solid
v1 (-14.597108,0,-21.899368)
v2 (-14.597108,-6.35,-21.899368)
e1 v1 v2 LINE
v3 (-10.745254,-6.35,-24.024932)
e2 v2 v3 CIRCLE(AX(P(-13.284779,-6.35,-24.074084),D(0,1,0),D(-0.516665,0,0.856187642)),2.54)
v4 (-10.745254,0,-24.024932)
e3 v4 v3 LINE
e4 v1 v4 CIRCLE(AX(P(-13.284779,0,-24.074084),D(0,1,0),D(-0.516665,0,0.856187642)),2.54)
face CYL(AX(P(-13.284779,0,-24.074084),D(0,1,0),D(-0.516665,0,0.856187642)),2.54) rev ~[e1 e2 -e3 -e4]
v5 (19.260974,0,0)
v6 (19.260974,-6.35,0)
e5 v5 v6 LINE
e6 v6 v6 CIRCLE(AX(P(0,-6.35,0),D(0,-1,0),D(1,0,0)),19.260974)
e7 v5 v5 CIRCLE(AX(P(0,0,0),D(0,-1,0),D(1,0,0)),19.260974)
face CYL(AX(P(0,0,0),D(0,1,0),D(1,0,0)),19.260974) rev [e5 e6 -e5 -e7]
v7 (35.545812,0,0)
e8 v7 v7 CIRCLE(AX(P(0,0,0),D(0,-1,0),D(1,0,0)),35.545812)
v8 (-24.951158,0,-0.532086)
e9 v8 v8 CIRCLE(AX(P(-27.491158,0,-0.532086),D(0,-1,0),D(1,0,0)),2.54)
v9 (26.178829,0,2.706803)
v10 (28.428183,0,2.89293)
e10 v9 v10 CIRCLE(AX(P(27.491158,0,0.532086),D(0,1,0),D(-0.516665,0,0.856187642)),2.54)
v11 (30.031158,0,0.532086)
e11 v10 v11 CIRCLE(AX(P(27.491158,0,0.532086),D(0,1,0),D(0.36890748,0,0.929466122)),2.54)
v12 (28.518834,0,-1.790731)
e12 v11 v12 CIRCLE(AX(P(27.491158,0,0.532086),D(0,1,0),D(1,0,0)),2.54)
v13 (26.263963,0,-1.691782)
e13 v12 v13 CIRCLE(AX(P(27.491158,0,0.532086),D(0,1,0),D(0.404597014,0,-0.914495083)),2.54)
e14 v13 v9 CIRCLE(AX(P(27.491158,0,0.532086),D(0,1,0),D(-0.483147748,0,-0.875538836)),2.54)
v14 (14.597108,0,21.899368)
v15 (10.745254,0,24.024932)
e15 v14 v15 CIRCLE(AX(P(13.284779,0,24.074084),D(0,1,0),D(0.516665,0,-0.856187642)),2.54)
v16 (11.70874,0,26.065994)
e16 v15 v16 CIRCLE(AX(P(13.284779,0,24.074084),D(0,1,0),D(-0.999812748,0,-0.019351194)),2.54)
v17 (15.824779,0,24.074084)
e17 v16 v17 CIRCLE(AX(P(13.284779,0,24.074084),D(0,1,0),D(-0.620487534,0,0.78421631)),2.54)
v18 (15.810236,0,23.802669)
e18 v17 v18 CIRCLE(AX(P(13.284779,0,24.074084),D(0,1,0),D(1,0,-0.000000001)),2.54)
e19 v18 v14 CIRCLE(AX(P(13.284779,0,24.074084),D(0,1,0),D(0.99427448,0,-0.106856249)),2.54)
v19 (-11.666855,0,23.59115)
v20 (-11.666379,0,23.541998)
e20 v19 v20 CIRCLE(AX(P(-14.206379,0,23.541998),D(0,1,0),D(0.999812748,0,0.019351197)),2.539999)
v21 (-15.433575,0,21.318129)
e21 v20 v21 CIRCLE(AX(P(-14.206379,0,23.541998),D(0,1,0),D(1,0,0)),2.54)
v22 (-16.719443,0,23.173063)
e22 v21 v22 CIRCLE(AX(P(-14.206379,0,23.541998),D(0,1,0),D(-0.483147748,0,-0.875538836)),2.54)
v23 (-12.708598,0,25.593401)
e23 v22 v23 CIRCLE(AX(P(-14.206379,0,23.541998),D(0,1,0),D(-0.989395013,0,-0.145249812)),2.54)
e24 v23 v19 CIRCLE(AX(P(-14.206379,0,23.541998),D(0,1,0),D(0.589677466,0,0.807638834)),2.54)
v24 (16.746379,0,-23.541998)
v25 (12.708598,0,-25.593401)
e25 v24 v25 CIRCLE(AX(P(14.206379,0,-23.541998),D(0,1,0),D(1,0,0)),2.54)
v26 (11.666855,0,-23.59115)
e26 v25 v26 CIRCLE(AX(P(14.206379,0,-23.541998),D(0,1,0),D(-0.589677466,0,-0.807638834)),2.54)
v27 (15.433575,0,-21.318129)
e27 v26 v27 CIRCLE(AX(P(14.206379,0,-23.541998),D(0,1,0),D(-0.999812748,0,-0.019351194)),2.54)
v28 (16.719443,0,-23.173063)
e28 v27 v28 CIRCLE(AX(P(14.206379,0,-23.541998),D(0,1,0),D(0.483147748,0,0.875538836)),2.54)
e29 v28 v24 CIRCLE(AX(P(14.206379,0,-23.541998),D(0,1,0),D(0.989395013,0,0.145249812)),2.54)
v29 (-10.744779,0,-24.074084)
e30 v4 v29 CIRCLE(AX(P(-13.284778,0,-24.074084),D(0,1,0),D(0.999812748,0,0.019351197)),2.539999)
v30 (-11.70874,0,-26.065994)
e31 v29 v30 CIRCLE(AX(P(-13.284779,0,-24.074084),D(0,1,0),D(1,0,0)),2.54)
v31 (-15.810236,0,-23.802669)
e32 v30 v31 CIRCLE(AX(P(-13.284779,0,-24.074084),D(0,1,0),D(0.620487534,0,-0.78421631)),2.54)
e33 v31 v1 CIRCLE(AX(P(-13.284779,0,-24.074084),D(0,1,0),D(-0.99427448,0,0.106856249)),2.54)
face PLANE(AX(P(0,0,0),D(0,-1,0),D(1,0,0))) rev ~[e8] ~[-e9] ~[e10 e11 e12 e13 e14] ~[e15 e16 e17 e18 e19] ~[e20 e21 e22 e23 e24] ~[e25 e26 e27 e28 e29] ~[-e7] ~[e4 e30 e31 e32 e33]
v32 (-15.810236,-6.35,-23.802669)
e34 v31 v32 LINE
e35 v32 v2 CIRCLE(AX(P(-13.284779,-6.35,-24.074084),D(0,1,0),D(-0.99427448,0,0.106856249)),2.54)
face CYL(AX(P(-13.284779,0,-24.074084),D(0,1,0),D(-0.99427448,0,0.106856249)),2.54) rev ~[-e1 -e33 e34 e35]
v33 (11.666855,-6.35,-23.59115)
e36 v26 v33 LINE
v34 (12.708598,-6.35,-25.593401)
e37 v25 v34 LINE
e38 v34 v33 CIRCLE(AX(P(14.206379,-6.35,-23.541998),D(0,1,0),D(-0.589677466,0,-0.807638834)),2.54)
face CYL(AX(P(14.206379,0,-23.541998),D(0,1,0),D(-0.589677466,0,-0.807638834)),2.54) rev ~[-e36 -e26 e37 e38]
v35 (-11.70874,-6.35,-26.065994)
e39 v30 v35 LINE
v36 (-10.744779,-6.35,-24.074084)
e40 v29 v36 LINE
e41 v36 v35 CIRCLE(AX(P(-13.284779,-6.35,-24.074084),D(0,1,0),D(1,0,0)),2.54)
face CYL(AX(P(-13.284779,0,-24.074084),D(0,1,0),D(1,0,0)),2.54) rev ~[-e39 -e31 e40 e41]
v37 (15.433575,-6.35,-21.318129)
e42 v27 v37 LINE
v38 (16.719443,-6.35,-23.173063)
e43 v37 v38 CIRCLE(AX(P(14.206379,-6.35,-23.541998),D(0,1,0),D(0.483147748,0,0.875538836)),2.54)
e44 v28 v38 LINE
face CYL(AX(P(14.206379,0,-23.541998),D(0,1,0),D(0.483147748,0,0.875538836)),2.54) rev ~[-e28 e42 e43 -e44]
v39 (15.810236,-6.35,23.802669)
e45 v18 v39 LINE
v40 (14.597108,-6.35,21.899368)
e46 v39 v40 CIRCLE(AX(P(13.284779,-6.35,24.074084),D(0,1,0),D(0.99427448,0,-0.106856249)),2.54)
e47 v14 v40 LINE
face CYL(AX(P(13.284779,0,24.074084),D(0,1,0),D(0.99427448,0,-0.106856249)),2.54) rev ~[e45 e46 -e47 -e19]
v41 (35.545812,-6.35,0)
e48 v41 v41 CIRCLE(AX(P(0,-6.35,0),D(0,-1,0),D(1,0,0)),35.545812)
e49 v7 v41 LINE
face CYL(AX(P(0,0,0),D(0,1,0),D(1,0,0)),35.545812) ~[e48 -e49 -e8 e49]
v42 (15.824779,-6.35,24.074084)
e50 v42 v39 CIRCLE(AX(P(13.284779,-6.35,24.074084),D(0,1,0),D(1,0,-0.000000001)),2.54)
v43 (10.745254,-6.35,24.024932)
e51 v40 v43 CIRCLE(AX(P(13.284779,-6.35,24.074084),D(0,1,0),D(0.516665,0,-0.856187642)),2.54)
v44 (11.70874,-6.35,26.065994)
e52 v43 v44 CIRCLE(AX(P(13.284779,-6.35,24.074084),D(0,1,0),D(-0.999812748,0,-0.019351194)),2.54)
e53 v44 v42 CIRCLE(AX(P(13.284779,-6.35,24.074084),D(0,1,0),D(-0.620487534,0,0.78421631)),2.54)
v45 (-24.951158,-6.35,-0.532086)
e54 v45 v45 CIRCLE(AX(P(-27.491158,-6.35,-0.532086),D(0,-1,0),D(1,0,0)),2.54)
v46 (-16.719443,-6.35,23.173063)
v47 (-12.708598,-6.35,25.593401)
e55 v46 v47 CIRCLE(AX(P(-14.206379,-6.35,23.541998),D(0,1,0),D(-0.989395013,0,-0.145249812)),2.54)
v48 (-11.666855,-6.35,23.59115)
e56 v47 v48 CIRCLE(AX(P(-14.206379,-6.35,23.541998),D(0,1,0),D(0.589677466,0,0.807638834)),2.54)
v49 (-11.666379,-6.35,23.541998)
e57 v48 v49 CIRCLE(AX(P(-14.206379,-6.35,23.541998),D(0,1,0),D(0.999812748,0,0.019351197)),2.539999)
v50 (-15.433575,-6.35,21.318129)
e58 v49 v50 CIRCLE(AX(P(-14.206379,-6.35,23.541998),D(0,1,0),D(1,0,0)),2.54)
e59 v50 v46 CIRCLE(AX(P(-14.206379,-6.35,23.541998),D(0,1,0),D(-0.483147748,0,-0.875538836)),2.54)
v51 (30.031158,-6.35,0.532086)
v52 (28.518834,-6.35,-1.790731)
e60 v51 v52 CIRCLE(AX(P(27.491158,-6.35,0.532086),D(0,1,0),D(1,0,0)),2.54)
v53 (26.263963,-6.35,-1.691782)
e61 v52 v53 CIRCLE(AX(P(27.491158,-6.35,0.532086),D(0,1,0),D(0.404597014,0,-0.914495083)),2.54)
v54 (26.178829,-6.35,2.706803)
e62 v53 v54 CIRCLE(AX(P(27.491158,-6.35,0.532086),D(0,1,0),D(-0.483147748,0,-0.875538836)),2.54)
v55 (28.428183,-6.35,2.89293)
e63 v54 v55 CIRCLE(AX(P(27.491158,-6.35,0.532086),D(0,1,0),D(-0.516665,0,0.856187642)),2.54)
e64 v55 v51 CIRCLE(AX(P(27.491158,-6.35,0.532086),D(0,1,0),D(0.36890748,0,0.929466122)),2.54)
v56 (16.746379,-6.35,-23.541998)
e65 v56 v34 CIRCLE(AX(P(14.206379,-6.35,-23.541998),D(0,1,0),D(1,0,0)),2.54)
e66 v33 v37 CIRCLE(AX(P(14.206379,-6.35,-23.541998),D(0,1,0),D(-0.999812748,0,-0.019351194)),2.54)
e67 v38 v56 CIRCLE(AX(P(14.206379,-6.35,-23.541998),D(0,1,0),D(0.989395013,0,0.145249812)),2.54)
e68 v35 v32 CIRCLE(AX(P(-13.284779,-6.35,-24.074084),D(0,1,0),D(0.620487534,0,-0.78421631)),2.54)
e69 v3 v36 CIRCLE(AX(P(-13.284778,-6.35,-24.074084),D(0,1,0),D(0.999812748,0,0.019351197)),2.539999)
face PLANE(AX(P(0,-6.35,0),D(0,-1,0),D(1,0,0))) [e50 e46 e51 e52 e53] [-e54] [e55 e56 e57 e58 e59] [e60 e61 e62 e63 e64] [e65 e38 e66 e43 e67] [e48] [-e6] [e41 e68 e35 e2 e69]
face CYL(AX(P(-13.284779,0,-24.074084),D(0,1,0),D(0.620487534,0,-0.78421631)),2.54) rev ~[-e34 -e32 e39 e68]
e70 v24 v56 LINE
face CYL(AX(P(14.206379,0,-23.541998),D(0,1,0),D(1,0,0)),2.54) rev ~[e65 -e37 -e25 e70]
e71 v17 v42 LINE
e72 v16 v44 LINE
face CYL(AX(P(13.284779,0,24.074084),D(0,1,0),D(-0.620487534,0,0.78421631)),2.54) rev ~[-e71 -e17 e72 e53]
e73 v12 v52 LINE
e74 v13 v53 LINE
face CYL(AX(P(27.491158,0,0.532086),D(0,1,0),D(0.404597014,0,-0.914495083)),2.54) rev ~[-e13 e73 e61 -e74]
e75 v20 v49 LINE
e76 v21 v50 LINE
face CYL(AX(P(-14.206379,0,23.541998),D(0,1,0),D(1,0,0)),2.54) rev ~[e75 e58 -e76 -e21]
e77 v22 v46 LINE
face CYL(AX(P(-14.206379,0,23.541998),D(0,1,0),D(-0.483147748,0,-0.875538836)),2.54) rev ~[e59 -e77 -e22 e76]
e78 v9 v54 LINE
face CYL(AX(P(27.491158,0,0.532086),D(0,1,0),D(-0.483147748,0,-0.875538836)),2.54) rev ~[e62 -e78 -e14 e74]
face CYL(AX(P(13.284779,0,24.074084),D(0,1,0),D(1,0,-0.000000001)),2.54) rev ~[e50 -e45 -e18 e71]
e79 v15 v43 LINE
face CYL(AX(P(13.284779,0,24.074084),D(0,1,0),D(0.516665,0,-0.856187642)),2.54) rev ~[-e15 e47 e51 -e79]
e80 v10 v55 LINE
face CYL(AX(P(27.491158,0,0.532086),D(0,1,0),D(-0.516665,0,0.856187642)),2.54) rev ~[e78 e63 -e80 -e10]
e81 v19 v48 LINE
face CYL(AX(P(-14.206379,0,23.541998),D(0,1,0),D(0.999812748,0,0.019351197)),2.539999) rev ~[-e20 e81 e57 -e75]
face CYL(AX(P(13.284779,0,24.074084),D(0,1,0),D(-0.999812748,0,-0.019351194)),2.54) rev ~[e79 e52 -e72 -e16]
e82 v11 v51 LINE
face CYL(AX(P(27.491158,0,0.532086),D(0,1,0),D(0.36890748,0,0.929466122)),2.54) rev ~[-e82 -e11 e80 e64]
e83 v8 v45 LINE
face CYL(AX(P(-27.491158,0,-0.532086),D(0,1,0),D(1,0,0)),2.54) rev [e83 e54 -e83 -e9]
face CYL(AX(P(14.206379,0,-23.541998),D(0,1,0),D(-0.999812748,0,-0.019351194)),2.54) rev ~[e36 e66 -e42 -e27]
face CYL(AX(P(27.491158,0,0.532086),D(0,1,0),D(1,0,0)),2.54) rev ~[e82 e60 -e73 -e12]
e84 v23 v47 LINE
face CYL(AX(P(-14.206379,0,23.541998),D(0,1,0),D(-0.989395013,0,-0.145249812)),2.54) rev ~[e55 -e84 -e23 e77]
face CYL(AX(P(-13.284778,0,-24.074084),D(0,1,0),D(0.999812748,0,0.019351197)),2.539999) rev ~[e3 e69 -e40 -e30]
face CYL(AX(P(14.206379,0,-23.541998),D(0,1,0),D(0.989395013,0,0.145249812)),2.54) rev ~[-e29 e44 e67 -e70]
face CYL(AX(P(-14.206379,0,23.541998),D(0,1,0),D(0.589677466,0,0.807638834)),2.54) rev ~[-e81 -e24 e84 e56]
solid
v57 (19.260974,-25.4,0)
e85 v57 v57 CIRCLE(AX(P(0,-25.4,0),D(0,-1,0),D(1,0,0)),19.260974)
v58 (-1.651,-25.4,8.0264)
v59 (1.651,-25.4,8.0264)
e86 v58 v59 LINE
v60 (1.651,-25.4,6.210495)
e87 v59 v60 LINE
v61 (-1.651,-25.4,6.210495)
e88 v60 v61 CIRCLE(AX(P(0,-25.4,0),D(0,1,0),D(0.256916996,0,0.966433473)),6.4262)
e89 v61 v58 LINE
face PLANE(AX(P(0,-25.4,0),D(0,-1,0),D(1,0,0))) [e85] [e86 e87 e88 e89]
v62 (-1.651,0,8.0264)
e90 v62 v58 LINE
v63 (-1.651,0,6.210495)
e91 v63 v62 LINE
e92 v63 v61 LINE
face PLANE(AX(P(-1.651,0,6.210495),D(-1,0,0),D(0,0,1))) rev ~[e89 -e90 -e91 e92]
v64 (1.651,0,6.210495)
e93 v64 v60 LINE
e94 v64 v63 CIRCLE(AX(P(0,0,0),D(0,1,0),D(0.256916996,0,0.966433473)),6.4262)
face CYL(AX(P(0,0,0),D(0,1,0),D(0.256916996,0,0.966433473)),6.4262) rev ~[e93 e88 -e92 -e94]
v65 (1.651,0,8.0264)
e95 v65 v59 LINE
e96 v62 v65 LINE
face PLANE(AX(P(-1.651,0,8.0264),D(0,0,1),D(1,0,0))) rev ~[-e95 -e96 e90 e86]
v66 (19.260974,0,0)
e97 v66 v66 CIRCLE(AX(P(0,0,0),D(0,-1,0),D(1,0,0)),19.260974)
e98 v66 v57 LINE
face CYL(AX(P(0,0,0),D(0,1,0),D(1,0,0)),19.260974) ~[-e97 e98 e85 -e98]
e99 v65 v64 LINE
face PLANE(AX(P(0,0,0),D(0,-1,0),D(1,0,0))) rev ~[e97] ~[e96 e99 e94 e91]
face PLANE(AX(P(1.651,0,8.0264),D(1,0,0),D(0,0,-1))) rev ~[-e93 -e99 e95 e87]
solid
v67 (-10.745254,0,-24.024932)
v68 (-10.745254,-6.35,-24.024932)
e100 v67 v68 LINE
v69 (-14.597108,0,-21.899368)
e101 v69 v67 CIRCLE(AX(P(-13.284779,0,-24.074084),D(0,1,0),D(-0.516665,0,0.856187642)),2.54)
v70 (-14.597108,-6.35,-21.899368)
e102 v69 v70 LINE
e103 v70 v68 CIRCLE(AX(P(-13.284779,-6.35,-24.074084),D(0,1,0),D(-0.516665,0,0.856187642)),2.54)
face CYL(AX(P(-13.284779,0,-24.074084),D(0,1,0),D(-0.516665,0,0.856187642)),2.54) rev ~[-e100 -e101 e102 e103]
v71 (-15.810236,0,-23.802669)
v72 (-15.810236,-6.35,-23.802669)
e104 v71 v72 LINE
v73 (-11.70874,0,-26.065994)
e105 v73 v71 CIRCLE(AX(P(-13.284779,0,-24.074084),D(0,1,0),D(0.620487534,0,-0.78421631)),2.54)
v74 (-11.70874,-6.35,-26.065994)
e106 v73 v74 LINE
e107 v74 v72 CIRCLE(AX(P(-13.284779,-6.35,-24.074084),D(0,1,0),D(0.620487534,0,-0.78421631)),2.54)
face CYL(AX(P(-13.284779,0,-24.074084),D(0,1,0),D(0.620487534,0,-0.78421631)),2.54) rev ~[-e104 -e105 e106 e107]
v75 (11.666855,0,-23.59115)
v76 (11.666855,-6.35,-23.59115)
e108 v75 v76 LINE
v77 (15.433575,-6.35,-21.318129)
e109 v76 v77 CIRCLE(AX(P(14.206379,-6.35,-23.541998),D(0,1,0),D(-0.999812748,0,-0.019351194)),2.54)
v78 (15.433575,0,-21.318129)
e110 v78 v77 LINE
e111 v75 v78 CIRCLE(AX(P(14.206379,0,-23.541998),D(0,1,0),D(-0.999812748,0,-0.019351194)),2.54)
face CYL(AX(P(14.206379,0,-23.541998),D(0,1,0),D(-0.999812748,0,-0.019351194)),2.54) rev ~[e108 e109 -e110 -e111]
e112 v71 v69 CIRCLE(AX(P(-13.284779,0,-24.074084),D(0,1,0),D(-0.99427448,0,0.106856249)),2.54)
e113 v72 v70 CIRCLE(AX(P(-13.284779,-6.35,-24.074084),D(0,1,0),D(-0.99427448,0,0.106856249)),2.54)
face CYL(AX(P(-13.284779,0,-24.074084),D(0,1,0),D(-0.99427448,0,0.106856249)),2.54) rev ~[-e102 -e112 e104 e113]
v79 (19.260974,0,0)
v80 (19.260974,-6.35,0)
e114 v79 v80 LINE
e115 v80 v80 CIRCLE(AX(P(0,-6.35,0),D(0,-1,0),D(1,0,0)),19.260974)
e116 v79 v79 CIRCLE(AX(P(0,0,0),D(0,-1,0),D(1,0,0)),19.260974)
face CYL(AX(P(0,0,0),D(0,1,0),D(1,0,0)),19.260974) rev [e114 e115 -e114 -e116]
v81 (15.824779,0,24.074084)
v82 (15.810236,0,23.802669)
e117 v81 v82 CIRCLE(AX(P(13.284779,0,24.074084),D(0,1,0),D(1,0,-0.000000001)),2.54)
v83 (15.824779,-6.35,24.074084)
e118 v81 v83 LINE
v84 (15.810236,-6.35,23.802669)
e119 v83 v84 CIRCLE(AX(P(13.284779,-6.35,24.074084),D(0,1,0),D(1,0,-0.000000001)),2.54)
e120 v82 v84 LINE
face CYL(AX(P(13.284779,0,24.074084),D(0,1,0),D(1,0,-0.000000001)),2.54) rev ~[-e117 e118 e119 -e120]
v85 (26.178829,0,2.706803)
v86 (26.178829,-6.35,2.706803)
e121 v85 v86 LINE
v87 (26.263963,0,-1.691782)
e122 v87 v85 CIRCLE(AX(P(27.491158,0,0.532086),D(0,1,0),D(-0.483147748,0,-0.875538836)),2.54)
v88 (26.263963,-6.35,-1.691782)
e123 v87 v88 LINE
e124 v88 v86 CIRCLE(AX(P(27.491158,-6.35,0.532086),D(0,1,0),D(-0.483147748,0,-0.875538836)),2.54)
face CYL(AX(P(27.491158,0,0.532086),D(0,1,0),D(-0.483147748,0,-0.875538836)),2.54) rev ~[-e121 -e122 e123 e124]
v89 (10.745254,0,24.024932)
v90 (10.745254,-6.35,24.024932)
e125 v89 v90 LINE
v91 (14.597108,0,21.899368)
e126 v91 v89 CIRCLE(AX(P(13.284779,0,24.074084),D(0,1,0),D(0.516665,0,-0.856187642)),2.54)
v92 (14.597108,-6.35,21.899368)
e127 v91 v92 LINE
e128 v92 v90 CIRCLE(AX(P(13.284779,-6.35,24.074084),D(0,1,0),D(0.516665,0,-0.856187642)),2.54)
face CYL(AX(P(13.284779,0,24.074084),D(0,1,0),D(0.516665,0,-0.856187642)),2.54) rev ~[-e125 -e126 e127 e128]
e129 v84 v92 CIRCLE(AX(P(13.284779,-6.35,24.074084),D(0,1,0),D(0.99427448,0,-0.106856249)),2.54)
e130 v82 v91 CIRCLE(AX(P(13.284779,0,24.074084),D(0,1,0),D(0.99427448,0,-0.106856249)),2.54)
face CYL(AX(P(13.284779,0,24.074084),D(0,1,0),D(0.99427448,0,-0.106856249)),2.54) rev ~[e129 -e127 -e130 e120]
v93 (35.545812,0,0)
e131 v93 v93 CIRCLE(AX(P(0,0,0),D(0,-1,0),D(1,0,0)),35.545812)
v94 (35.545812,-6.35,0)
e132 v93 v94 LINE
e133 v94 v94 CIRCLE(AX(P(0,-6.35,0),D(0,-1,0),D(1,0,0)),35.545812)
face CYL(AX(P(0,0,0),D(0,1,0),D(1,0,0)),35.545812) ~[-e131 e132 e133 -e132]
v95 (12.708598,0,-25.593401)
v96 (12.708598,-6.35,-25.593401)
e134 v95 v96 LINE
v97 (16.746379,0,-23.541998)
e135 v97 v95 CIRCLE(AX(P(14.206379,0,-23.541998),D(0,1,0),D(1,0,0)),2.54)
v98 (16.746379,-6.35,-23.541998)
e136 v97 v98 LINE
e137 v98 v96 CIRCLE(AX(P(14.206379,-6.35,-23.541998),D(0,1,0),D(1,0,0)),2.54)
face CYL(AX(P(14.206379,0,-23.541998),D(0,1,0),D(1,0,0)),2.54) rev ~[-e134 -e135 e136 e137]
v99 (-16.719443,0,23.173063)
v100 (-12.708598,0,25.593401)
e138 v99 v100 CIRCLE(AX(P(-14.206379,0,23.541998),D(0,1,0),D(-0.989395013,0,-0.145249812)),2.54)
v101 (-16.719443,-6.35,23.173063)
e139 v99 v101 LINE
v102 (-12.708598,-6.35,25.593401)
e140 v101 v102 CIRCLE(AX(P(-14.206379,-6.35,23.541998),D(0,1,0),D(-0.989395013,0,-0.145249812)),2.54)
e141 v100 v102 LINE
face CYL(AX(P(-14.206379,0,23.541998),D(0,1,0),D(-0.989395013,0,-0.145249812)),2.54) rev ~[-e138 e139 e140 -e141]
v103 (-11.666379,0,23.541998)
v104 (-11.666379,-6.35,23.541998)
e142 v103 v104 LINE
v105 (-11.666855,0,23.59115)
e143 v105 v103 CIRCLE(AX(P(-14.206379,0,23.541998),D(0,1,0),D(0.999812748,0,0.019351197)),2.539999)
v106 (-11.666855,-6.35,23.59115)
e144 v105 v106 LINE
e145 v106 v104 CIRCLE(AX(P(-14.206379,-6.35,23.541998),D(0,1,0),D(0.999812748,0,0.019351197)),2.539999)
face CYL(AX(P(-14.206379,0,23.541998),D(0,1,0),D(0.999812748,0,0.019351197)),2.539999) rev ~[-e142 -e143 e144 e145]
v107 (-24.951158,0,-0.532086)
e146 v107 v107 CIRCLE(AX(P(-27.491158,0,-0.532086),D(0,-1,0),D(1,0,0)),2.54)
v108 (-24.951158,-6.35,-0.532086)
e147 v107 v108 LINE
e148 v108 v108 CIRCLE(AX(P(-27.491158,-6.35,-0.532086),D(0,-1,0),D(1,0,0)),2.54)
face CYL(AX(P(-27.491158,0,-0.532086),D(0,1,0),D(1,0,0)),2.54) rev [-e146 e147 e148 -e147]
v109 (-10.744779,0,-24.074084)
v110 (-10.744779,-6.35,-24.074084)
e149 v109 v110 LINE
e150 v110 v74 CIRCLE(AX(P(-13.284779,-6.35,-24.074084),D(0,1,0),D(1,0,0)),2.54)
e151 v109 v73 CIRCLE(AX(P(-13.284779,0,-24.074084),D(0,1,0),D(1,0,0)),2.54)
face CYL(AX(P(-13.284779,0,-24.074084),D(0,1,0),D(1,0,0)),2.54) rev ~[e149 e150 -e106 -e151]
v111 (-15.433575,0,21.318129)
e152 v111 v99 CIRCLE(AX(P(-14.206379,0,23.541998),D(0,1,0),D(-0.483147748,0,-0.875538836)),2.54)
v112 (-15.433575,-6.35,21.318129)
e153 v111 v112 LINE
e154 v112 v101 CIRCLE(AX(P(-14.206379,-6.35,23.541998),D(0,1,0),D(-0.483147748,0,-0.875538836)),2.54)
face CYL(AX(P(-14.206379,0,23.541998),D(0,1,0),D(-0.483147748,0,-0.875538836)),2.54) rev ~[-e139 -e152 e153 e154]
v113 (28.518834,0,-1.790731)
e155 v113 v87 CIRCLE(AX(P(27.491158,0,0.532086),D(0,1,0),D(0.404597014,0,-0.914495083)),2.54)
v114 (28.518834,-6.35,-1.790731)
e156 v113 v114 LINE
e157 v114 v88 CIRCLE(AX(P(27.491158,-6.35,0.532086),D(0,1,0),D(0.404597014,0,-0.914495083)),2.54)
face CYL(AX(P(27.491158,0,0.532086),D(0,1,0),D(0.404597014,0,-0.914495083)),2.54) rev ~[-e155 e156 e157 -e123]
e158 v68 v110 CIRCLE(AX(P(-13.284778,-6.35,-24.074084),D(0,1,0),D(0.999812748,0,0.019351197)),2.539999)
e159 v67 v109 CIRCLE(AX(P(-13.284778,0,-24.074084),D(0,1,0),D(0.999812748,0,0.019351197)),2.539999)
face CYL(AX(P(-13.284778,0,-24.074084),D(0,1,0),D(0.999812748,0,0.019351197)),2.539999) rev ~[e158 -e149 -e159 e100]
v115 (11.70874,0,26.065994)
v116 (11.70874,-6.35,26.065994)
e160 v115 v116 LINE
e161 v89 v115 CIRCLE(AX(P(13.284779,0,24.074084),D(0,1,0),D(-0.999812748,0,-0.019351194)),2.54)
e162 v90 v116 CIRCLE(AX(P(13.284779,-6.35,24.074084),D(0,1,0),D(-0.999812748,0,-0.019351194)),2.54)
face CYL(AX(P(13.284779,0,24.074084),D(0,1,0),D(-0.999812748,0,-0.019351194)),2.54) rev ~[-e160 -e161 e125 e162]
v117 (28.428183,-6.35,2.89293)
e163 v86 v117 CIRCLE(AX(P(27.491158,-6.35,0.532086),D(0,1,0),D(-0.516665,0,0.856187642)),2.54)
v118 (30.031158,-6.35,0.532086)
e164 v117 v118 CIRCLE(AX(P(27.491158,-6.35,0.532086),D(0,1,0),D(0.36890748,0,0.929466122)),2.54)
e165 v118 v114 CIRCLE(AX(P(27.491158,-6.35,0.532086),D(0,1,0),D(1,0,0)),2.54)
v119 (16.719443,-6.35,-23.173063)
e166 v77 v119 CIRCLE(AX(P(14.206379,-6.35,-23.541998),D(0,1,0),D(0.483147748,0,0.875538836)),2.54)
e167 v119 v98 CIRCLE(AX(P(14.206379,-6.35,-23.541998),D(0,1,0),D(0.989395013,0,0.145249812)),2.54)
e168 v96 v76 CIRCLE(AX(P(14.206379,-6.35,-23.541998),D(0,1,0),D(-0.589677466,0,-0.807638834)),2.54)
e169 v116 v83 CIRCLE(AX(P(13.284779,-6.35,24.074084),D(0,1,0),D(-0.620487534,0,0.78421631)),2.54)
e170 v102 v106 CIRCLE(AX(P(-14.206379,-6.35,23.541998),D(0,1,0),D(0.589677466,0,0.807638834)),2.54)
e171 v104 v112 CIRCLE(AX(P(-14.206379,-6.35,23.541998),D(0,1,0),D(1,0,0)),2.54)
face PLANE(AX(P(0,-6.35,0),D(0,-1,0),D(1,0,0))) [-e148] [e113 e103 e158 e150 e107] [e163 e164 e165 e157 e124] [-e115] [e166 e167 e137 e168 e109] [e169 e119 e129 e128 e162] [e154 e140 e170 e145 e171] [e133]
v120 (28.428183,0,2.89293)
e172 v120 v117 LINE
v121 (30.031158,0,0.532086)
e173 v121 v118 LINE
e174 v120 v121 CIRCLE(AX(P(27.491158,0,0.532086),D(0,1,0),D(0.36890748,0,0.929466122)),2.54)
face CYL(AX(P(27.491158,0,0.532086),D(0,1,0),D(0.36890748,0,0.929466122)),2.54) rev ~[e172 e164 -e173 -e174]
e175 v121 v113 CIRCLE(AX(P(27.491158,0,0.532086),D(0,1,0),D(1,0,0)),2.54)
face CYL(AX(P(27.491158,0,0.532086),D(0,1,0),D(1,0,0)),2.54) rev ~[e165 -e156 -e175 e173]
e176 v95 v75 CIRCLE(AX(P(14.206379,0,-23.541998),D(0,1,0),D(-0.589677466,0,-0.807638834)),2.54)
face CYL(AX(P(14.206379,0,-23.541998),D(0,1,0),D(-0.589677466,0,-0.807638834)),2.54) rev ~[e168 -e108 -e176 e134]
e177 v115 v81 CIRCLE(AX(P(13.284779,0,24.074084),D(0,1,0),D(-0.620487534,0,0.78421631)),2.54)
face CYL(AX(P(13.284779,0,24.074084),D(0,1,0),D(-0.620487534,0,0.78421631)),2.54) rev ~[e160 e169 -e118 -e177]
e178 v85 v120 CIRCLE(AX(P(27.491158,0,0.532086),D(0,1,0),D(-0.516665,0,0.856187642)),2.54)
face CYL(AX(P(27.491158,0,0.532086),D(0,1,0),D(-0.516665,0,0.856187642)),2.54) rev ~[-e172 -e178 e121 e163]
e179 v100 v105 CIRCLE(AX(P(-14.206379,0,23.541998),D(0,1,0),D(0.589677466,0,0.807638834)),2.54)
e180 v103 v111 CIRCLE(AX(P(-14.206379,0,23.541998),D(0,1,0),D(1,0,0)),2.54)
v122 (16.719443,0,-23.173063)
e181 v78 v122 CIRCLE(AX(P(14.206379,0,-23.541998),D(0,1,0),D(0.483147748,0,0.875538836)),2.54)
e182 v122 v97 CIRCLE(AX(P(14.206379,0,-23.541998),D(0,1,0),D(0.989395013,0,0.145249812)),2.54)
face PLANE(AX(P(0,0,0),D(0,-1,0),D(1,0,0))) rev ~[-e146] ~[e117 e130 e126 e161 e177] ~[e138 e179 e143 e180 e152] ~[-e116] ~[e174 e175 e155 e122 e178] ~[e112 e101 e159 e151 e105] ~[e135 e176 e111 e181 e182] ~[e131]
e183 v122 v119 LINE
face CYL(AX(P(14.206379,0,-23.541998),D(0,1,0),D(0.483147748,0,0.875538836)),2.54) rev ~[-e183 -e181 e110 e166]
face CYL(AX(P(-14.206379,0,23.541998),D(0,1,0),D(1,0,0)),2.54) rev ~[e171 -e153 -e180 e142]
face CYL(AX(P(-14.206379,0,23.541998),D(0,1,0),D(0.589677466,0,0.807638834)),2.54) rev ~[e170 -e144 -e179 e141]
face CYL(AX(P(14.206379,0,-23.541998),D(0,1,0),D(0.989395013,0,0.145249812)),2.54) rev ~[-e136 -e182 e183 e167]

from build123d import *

# Parameters (mm, degrees)
F0_R     = 19.2609735147
F0_R_2   = 12.2005703348
F1_DEPTH = 25.4
F0_R_3   = 35.5458123626
F0_R_4   = 2.54
F2_DEPTH = 6.35
F3_DEPTH = 6.35


# Not quite as in the source:
# - a feature names something its author has since deleted; it is built from what else it names


with BuildPart() as f1:
    # F0 (on Front) → F1 (new body)
    with BuildSketch(Plane.XZ):
        Circle(F0_R)
        Circle(F0_R_2, mode=Mode.SUBTRACT)
        Circle(F0_R_2)
        with BuildLine():
            ThreePointArc((1.651, 6.2104947822), (0, -6.4262), (-1.651, 6.2104947822))
            Line((-1.651, 6.2104947822), (-1.651, 8.0264))
            Line((-1.651, 8.0264), (1.651, 8.0264))
            Line((1.651, 8.0264), (1.651, 6.2104947822))
        make_face(mode=Mode.SUBTRACT)
    extrude(amount=F1_DEPTH)


with BuildPart() as f2:
    # F0 (on Front) → F2 (new body)
    with BuildSketch(Plane.XZ):
        Circle(F0_R_3)
        with BuildLine():
            ThreePointArc((-15.8102357857, -23.8026693755), (-15.4266913627, -22.7088700736), (-14.5971077055, -21.899367638))
            ThreePointArc((-14.5971077055, -21.899367638), (-12.0575833253, -21.8502156048), (-10.7452542258, -24.024932215))
            ThreePointArc((-10.7452542258, -24.024932215), (-10.7448975137, -24.0495070811), (-10.744778606, -24.0740842482))
            ThreePointArc((-10.744778606, -24.0740842482), (-10.9984346498, -25.1805341179), (-11.7087402706, -26.0659936752))
            ThreePointArc((-11.7087402706, -26.0659936752), (-14.5119738867, -26.2979528916), (-15.8102357857, -23.8026693755))
        make_face(mode=Mode.SUBTRACT)
        with Locations((-27.4911578348, -0.5320863677)):
            Circle(F0_R_4, mode=Mode.SUBTRACT)
        with BuildLine():
            ThreePointArc((12.7085984642, -25.593400518), (11.9531126936, -24.7143416532), (11.6668548486, -23.5911499138))
            ThreePointArc((11.6668548486, -23.5911499138), (12.8940501293, -21.3672812704), (15.4335745095, -21.3181292371))
            ThreePointArc((15.4335745095, -21.3181292371), (16.2938606715, -22.0949245492), (16.7194425623, -23.1730633582))
            ThreePointArc((16.7194425623, -23.1730633582), (16.7396361115, -23.3570395976), (16.7463792288, -23.5419978805))
            ThreePointArc((16.7463792288, -23.5419978805), (15.3568653995, -25.8065025882), (12.7085984642, -25.593400518))
        make_face(mode=Mode.SUBTRACT)
        with BuildLine():
            ThreePointArc((-12.7085984642, 25.593400518), (-11.9531126936, 24.7143416532), (-11.6668548486, 23.5911499138))
            ThreePointArc((-11.6668548486, 23.5911499138), (-11.6664981365, 23.5665750477), (-11.6663792288, 23.5419978805))
            ThreePointArc((-11.6663792288, 23.5419978805), (-12.9151542316, 21.3546849156), (-15.4335745095, 21.3181292371))
            ThreePointArc((-15.4335745095, 21.3181292371), (-16.2938606715, 22.0949245492), (-16.7194425623, 23.1730633582))
            ThreePointArc((-16.7194425623, 23.1730633582), (-15.5187083283, 25.7167144907), (-12.7085984642, 25.593400518))
        make_face(mode=Mode.SUBTRACT)
        Circle(F0_R, mode=Mode.SUBTRACT)
        with BuildLine():
            ThreePointArc((28.5188342499, -1.7907311425), (27.3798040563, -2.0054715796), (26.2639625541, -1.6917822757))
            ThreePointArc((26.2639625541, -1.6917822757), (24.9516334546, 0.4829343345), (26.1788287353, 2.7068029779))
            ThreePointArc((26.1788287353, 2.7068029779), (27.2816962901, 3.0634349927), (28.4281828329, 2.892930317))
            ThreePointArc((28.4281828329, 2.892930317), (29.592543508, 1.9588933807), (30.0311578348, 0.5320863677))
            ThreePointArc((30.0311578348, 0.5320863677), (29.6197604391, -0.8537891508), (28.5188342499, -1.7907311425))
        make_face(mode=Mode.SUBTRACT)
        with BuildLine():
            ThreePointArc((15.8102357857, 23.8026693755), (15.4266913627, 22.7088700736), (14.5971077055, 21.899367638))
            ThreePointArc((14.5971077055, 21.899367638), (12.0575833253, 21.8502156048), (10.7452542258, 24.024932215))
            ThreePointArc((10.7452542258, 24.024932215), (10.9878356185, 25.1583595419), (11.7087402706, 26.0659936752))
            ThreePointArc((11.7087402706, 26.0659936752), (14.3912284756, 26.3604282044), (15.824778606, 24.0740842482))
            ThreePointArc((15.824778606, 24.0740842482), (15.8211402951, 23.9381821449), (15.8102357857, 23.8026693755))
        make_face(mode=Mode.SUBTRACT)
    extrude(amount=F2_DEPTH)


with BuildPart() as f3:
    # F0 (on Front) → F3 (new body)
    with BuildSketch(Plane.XZ):
        Circle(F0_R_3)
        with BuildLine():
            ThreePointArc((-15.8102357857, -23.8026693755), (-15.4266913627, -22.7088700736), (-14.5971077055, -21.899367638))
            ThreePointArc((-14.5971077055, -21.899367638), (-12.0575833253, -21.8502156048), (-10.7452542258, -24.024932215))
            ThreePointArc((-10.7452542258, -24.024932215), (-10.7448975137, -24.0495070811), (-10.744778606, -24.0740842482))
            ThreePointArc((-10.744778606, -24.0740842482), (-10.9984346498, -25.1805341179), (-11.7087402706, -26.0659936752))
            ThreePointArc((-11.7087402706, -26.0659936752), (-14.5119738867, -26.2979528916), (-15.8102357857, -23.8026693755))
        make_face(mode=Mode.SUBTRACT)
        with Locations((-27.4911578348, -0.5320863677)):
            Circle(F0_R_4, mode=Mode.SUBTRACT)
        with BuildLine():
            ThreePointArc((12.7085984642, -25.593400518), (11.9531126936, -24.7143416532), (11.6668548486, -23.5911499138))
            ThreePointArc((11.6668548486, -23.5911499138), (12.8940501293, -21.3672812704), (15.4335745095, -21.3181292371))
            ThreePointArc((15.4335745095, -21.3181292371), (16.2938606715, -22.0949245492), (16.7194425623, -23.1730633582))
            ThreePointArc((16.7194425623, -23.1730633582), (16.7396361115, -23.3570395976), (16.7463792288, -23.5419978805))
            ThreePointArc((16.7463792288, -23.5419978805), (15.3568653995, -25.8065025882), (12.7085984642, -25.593400518))
        make_face(mode=Mode.SUBTRACT)
        with BuildLine():
            ThreePointArc((-12.7085984642, 25.593400518), (-11.9531126936, 24.7143416532), (-11.6668548486, 23.5911499138))
            ThreePointArc((-11.6668548486, 23.5911499138), (-11.6664981365, 23.5665750477), (-11.6663792288, 23.5419978805))
            ThreePointArc((-11.6663792288, 23.5419978805), (-12.9151542316, 21.3546849156), (-15.4335745095, 21.3181292371))
            ThreePointArc((-15.4335745095, 21.3181292371), (-16.2938606715, 22.0949245492), (-16.7194425623, 23.1730633582))
            ThreePointArc((-16.7194425623, 23.1730633582), (-15.5187083283, 25.7167144907), (-12.7085984642, 25.593400518))
        make_face(mode=Mode.SUBTRACT)
        Circle(F0_R, mode=Mode.SUBTRACT)
        with BuildLine():
            ThreePointArc((28.5188342499, -1.7907311425), (27.3798040563, -2.0054715796), (26.2639625541, -1.6917822757))
            ThreePointArc((26.2639625541, -1.6917822757), (24.9516334546, 0.4829343345), (26.1788287353, 2.7068029779))
            ThreePointArc((26.1788287353, 2.7068029779), (27.2816962901, 3.0634349927), (28.4281828329, 2.892930317))
            ThreePointArc((28.4281828329, 2.892930317), (29.592543508, 1.9588933807), (30.0311578348, 0.5320863677))
            ThreePointArc((30.0311578348, 0.5320863677), (29.6197604391, -0.8537891508), (28.5188342499, -1.7907311425))
        make_face(mode=Mode.SUBTRACT)
        with BuildLine():
            ThreePointArc((15.8102357857, 23.8026693755), (15.4266913627, 22.7088700736), (14.5971077055, 21.899367638))
            ThreePointArc((14.5971077055, 21.899367638), (12.0575833253, 21.8502156048), (10.7452542258, 24.024932215))
            ThreePointArc((10.7452542258, 24.024932215), (10.9878356185, 25.1583595419), (11.7087402706, 26.0659936752))
            ThreePointArc((11.7087402706, 26.0659936752), (14.3912284756, 26.3604282044), (15.824778606, 24.0740842482))
            ThreePointArc((15.824778606, 24.0740842482), (15.8211402951, 23.9381821449), (15.8102357857, 23.8026693755))
        make_face(mode=Mode.SUBTRACT)
    extrude(amount=F3_DEPTH)


solid = Compound([f1.part, f2.part, f3.part])
